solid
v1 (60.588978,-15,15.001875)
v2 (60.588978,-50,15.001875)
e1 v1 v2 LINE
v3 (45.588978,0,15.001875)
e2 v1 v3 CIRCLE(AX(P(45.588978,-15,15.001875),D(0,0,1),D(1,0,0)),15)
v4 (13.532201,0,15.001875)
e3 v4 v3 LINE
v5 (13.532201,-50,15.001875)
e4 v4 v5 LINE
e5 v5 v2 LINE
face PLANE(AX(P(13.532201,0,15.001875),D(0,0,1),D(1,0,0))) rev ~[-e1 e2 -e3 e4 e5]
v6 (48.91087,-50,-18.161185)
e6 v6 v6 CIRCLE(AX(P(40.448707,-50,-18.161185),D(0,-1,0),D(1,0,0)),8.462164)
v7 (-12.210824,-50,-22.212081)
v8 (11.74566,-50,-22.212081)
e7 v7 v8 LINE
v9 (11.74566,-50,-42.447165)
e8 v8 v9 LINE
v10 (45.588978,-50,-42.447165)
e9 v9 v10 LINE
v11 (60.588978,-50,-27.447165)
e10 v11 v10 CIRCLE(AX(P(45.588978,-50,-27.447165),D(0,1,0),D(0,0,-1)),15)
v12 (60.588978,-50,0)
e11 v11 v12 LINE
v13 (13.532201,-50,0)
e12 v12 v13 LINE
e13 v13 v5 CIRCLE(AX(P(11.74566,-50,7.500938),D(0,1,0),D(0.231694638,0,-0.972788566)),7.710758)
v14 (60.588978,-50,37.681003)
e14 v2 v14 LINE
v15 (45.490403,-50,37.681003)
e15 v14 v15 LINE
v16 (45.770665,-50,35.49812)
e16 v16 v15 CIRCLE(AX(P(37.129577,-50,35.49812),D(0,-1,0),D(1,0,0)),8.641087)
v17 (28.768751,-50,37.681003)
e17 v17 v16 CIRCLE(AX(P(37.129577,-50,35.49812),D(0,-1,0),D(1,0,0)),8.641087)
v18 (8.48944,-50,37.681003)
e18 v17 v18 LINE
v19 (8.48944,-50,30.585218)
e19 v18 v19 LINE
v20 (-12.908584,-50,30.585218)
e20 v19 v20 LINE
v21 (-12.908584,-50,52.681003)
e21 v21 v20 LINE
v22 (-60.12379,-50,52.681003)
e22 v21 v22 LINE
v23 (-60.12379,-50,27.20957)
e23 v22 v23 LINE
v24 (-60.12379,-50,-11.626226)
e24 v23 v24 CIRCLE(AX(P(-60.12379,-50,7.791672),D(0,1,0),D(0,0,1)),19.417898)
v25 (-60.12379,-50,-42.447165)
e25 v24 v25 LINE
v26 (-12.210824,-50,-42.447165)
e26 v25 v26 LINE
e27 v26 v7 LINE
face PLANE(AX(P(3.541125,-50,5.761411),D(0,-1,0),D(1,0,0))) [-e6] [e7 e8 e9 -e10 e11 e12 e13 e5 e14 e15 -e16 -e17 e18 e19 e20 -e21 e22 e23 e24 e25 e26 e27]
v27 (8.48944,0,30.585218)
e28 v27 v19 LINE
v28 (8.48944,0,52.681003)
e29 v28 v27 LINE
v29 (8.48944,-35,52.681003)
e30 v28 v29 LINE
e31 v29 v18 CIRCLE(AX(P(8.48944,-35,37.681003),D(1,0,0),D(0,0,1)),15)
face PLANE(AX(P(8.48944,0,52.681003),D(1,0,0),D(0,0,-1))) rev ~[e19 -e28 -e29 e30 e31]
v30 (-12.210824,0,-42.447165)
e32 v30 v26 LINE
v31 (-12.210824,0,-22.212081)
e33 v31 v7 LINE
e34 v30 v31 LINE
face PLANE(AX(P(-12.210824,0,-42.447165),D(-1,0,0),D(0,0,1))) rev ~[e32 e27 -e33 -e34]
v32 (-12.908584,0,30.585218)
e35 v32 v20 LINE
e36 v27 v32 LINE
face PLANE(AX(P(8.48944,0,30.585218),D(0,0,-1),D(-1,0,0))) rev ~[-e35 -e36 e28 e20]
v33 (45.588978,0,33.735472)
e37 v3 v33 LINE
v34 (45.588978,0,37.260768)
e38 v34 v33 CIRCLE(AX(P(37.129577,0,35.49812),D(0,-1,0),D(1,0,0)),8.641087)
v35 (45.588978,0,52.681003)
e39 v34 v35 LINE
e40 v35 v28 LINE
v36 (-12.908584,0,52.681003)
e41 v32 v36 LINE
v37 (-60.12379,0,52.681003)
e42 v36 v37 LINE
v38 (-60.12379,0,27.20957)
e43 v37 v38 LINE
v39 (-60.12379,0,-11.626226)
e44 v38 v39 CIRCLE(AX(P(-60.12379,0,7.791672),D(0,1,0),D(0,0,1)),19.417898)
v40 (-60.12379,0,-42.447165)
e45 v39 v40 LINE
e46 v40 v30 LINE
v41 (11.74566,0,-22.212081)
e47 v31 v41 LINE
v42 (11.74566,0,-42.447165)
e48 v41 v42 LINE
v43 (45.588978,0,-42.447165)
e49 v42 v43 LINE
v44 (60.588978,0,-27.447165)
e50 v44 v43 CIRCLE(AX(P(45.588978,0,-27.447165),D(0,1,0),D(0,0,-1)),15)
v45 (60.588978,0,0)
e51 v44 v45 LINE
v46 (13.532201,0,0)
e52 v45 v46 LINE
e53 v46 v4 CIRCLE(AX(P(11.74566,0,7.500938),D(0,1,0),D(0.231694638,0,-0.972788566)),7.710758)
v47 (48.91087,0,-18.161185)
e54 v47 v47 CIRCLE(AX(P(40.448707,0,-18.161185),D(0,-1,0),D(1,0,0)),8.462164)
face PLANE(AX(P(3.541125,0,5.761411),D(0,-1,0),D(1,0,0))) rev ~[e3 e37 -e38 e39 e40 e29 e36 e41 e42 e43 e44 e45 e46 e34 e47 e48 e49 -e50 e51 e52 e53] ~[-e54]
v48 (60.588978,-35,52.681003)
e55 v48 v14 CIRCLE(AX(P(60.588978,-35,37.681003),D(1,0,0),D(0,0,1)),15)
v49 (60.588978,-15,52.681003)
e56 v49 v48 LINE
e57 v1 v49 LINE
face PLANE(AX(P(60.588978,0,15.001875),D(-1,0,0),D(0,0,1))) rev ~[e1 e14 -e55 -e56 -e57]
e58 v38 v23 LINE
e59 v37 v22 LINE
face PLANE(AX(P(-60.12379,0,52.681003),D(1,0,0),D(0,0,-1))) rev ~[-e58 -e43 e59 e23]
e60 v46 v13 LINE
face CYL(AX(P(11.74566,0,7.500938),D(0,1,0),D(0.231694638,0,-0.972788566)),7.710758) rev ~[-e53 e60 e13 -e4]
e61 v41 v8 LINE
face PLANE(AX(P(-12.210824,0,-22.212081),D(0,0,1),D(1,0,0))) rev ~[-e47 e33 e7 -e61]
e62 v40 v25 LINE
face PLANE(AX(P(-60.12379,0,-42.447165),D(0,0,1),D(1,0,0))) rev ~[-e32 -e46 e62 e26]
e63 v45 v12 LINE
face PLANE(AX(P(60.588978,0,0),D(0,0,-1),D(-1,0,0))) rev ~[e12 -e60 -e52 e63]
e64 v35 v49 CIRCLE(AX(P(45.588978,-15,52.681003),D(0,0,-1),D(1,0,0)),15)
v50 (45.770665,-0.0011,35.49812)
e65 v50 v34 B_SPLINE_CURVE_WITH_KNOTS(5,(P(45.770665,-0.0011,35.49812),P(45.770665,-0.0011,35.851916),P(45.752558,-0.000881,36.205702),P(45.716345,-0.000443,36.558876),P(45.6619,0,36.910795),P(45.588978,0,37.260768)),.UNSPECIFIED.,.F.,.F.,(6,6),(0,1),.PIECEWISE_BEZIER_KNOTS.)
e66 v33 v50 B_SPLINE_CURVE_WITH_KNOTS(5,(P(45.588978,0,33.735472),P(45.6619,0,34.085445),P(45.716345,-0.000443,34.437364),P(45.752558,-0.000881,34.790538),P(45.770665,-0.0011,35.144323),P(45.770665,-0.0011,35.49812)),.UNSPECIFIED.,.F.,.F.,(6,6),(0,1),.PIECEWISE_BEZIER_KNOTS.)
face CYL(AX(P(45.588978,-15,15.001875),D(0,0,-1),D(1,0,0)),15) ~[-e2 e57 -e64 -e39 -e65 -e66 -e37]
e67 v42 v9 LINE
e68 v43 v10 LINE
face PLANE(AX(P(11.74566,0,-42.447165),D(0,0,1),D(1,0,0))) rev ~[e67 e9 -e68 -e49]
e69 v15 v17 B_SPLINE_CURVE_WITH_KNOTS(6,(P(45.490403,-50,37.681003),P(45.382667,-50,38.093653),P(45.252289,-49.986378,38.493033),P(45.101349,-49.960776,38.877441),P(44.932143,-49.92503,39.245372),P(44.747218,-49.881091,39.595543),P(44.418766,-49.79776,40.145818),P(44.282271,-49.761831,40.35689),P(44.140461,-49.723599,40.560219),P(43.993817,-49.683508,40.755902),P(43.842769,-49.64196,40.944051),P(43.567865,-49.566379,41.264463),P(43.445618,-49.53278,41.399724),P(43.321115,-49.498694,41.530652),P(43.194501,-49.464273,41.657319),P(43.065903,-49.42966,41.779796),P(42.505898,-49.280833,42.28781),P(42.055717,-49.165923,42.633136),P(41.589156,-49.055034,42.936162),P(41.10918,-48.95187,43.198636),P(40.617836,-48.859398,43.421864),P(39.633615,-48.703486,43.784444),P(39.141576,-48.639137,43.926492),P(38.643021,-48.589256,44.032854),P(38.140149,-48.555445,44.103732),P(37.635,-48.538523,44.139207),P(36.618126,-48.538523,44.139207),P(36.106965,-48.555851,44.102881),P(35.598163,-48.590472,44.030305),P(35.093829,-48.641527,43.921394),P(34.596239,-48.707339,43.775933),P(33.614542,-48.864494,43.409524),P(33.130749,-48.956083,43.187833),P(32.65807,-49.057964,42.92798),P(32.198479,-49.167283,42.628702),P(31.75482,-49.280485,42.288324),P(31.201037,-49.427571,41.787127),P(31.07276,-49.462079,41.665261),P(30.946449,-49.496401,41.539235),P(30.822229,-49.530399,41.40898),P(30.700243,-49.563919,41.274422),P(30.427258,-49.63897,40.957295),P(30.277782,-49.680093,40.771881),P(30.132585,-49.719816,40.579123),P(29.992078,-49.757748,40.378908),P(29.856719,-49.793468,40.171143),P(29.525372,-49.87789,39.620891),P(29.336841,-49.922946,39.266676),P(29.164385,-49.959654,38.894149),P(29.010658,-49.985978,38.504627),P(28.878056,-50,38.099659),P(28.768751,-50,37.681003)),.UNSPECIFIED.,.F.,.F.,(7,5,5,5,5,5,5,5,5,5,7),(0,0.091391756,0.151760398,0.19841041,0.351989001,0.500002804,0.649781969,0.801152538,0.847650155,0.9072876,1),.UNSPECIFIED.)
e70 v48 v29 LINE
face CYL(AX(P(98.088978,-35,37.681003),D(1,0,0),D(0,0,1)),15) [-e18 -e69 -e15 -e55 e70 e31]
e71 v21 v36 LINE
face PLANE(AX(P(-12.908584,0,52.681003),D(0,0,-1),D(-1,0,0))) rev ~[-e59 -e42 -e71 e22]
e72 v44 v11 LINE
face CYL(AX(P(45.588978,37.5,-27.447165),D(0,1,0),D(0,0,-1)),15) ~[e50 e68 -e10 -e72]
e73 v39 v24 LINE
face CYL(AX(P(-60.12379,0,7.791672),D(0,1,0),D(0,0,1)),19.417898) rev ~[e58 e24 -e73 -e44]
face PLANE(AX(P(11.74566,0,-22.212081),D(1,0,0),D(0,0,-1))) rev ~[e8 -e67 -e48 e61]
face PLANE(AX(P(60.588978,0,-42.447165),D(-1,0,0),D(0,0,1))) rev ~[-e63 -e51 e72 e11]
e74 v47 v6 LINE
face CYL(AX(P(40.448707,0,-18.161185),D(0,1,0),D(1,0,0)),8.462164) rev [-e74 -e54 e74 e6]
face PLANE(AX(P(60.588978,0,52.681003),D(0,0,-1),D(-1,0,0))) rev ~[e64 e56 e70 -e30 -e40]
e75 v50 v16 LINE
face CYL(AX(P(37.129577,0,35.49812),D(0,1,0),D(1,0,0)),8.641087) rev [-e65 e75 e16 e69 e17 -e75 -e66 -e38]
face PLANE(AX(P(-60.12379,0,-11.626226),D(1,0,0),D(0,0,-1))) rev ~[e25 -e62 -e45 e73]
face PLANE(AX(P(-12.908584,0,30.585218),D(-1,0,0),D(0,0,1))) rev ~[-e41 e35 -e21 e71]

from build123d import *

# Parameters (mm, degrees)
F0_R        = 8.4621636151
F0_R_2      = 8.6410874337
F1_DEPTH    = 50
F4_T1_DEPTH = 125
F4_T3_DEPTH = 75.1791274175
F4_T8_DEPTH = 127.0995380357


# Not quite as in the source:
# - a fillet or chamfer that OpenCascade refuses, or shapes differently, is made with other operations: its cross-section is extruded or revolved along the edge and cut away or added
# - a feature of the source that left no trace in its solid (it failed there, or was rolled back) is left out


with BuildPart() as f1:
    # F0 (on Front) → F1 (new body)
    with BuildSketch(Plane.XZ):
        with BuildLine():
            Line((-12.9085844383, 52.6810027659), (-60.1237900555, 52.6810027659))
            Line((-60.1237900555, 52.6810027659), (-60.1237900555, 27.209569862))
            ThreePointArc((-60.1237900555, 27.209569862), (-40.7058920955, 7.7916719019), (-60.1237900555, -11.6262260581))
            Line((-60.1237900555, -11.6262260581), (-60.1237900555, -42.4471646547))
            Line((-60.1237900555, -42.4471646547), (-12.2108235955, -42.4471646547))
            Line((-12.2108235955, -42.4471646547), (-12.2108235955, -22.2120806575))
            Line((-12.2108235955, -22.2120806575), (11.7456596345, -22.2120806575))
            Line((11.7456596345, -22.2120806575), (11.7456596345, -42.4471646547))
            Line((11.7456596345, -42.4471646547), (60.588978231, -42.4471646547))
            Line((60.588978231, -42.4471646547), (60.588978231, 0))
            Line((60.588978231, 0), (13.5322010265, 0))
            ThreePointArc((13.5322010265, 0), (4.0349011674, 7.5009376742), (13.5322010265, 15.0018753484))
            Line((13.5322010265, 15.0018753484), (60.588978231, 15.0018753484))
            Line((60.588978231, 15.0018753484), (60.588978231, 52.6810027659))
            Line((60.588978231, 52.6810027659), (8.4894401953, 52.6810027659))
            Line((8.4894401953, 52.6810027659), (8.4894401953, 30.5852182209))
            Line((8.4894401953, 30.5852182209), (-12.9085844383, 30.5852182209))
            Line((-12.9085844383, 30.5852182209), (-12.9085844383, 52.6810027659))
        make_face()
        with Locations((40.4487065971, -18.1611850858)):
            Circle(F0_R, mode=Mode.SUBTRACT)
        with Locations((37.1295772493, 35.4981198907)):
            Circle(F0_R_2, mode=Mode.SUBTRACT)
    extrude(amount=F1_DEPTH)

    # F4: fillet of radius 15 on 3 edges, made by hand

    # F4_s2 → F4_t1 (cut)
    with BuildSketch(Plane.XZ.offset(-37.5)):
        with BuildLine():
            ThreePointArc((45.588978231, -42.4471646547), (56.1955799488, -38.0537663725), (60.588978231, -27.4471646547))
            Line((60.588978231, -27.4471646547), (60.588978231, -42.4471646547))
            Line((60.588978231, -42.4471646547), (45.588978231, -42.4471646547))
        make_face()
    extrude(amount=F4_T1_DEPTH, mode=Mode.SUBTRACT)

    # F4_s4 → F4_t3 (cut)
    with BuildSketch(Plane.XY.offset(15.0018753484)):
        with BuildLine():
            ThreePointArc((60.588978231, -15), (56.1955799488, -4.3933982822), (45.588978231, 0))
            Line((45.588978231, 0), (60.588978231, 0))
            Line((60.588978231, 0), (60.588978231, -15))
        make_face()
    extrude(amount=F4_T3_DEPTH, mode=Mode.SUBTRACT)


with BuildPart() as f4_tool6:
    # F4_s7 → F4_t8 (new body)
    with BuildSketch(Plane.YZ.offset(98.088978231)):
        with BuildLine():
            ThreePointArc((-35, 52.6810027659), (-45.6066017178, 48.2876044837), (-50, 37.6810027659))
            Line((-50, 37.6810027659), (-50, 52.6810027659))
            Line((-50, 52.6810027659), (-35, 52.6810027659))
        make_face()
    extrude(amount=-F4_T8_DEPTH)

    split(bisect_by=Plane.YZ.offset(-12.9085844383), keep=Keep.TOP)


with BuildPart() as f1_1:
    add(f1.part)

    # F4_t5: cut F4_tool6
    add(f4_tool6.part, mode=Mode.SUBTRACT)


solid = f1_1.part
